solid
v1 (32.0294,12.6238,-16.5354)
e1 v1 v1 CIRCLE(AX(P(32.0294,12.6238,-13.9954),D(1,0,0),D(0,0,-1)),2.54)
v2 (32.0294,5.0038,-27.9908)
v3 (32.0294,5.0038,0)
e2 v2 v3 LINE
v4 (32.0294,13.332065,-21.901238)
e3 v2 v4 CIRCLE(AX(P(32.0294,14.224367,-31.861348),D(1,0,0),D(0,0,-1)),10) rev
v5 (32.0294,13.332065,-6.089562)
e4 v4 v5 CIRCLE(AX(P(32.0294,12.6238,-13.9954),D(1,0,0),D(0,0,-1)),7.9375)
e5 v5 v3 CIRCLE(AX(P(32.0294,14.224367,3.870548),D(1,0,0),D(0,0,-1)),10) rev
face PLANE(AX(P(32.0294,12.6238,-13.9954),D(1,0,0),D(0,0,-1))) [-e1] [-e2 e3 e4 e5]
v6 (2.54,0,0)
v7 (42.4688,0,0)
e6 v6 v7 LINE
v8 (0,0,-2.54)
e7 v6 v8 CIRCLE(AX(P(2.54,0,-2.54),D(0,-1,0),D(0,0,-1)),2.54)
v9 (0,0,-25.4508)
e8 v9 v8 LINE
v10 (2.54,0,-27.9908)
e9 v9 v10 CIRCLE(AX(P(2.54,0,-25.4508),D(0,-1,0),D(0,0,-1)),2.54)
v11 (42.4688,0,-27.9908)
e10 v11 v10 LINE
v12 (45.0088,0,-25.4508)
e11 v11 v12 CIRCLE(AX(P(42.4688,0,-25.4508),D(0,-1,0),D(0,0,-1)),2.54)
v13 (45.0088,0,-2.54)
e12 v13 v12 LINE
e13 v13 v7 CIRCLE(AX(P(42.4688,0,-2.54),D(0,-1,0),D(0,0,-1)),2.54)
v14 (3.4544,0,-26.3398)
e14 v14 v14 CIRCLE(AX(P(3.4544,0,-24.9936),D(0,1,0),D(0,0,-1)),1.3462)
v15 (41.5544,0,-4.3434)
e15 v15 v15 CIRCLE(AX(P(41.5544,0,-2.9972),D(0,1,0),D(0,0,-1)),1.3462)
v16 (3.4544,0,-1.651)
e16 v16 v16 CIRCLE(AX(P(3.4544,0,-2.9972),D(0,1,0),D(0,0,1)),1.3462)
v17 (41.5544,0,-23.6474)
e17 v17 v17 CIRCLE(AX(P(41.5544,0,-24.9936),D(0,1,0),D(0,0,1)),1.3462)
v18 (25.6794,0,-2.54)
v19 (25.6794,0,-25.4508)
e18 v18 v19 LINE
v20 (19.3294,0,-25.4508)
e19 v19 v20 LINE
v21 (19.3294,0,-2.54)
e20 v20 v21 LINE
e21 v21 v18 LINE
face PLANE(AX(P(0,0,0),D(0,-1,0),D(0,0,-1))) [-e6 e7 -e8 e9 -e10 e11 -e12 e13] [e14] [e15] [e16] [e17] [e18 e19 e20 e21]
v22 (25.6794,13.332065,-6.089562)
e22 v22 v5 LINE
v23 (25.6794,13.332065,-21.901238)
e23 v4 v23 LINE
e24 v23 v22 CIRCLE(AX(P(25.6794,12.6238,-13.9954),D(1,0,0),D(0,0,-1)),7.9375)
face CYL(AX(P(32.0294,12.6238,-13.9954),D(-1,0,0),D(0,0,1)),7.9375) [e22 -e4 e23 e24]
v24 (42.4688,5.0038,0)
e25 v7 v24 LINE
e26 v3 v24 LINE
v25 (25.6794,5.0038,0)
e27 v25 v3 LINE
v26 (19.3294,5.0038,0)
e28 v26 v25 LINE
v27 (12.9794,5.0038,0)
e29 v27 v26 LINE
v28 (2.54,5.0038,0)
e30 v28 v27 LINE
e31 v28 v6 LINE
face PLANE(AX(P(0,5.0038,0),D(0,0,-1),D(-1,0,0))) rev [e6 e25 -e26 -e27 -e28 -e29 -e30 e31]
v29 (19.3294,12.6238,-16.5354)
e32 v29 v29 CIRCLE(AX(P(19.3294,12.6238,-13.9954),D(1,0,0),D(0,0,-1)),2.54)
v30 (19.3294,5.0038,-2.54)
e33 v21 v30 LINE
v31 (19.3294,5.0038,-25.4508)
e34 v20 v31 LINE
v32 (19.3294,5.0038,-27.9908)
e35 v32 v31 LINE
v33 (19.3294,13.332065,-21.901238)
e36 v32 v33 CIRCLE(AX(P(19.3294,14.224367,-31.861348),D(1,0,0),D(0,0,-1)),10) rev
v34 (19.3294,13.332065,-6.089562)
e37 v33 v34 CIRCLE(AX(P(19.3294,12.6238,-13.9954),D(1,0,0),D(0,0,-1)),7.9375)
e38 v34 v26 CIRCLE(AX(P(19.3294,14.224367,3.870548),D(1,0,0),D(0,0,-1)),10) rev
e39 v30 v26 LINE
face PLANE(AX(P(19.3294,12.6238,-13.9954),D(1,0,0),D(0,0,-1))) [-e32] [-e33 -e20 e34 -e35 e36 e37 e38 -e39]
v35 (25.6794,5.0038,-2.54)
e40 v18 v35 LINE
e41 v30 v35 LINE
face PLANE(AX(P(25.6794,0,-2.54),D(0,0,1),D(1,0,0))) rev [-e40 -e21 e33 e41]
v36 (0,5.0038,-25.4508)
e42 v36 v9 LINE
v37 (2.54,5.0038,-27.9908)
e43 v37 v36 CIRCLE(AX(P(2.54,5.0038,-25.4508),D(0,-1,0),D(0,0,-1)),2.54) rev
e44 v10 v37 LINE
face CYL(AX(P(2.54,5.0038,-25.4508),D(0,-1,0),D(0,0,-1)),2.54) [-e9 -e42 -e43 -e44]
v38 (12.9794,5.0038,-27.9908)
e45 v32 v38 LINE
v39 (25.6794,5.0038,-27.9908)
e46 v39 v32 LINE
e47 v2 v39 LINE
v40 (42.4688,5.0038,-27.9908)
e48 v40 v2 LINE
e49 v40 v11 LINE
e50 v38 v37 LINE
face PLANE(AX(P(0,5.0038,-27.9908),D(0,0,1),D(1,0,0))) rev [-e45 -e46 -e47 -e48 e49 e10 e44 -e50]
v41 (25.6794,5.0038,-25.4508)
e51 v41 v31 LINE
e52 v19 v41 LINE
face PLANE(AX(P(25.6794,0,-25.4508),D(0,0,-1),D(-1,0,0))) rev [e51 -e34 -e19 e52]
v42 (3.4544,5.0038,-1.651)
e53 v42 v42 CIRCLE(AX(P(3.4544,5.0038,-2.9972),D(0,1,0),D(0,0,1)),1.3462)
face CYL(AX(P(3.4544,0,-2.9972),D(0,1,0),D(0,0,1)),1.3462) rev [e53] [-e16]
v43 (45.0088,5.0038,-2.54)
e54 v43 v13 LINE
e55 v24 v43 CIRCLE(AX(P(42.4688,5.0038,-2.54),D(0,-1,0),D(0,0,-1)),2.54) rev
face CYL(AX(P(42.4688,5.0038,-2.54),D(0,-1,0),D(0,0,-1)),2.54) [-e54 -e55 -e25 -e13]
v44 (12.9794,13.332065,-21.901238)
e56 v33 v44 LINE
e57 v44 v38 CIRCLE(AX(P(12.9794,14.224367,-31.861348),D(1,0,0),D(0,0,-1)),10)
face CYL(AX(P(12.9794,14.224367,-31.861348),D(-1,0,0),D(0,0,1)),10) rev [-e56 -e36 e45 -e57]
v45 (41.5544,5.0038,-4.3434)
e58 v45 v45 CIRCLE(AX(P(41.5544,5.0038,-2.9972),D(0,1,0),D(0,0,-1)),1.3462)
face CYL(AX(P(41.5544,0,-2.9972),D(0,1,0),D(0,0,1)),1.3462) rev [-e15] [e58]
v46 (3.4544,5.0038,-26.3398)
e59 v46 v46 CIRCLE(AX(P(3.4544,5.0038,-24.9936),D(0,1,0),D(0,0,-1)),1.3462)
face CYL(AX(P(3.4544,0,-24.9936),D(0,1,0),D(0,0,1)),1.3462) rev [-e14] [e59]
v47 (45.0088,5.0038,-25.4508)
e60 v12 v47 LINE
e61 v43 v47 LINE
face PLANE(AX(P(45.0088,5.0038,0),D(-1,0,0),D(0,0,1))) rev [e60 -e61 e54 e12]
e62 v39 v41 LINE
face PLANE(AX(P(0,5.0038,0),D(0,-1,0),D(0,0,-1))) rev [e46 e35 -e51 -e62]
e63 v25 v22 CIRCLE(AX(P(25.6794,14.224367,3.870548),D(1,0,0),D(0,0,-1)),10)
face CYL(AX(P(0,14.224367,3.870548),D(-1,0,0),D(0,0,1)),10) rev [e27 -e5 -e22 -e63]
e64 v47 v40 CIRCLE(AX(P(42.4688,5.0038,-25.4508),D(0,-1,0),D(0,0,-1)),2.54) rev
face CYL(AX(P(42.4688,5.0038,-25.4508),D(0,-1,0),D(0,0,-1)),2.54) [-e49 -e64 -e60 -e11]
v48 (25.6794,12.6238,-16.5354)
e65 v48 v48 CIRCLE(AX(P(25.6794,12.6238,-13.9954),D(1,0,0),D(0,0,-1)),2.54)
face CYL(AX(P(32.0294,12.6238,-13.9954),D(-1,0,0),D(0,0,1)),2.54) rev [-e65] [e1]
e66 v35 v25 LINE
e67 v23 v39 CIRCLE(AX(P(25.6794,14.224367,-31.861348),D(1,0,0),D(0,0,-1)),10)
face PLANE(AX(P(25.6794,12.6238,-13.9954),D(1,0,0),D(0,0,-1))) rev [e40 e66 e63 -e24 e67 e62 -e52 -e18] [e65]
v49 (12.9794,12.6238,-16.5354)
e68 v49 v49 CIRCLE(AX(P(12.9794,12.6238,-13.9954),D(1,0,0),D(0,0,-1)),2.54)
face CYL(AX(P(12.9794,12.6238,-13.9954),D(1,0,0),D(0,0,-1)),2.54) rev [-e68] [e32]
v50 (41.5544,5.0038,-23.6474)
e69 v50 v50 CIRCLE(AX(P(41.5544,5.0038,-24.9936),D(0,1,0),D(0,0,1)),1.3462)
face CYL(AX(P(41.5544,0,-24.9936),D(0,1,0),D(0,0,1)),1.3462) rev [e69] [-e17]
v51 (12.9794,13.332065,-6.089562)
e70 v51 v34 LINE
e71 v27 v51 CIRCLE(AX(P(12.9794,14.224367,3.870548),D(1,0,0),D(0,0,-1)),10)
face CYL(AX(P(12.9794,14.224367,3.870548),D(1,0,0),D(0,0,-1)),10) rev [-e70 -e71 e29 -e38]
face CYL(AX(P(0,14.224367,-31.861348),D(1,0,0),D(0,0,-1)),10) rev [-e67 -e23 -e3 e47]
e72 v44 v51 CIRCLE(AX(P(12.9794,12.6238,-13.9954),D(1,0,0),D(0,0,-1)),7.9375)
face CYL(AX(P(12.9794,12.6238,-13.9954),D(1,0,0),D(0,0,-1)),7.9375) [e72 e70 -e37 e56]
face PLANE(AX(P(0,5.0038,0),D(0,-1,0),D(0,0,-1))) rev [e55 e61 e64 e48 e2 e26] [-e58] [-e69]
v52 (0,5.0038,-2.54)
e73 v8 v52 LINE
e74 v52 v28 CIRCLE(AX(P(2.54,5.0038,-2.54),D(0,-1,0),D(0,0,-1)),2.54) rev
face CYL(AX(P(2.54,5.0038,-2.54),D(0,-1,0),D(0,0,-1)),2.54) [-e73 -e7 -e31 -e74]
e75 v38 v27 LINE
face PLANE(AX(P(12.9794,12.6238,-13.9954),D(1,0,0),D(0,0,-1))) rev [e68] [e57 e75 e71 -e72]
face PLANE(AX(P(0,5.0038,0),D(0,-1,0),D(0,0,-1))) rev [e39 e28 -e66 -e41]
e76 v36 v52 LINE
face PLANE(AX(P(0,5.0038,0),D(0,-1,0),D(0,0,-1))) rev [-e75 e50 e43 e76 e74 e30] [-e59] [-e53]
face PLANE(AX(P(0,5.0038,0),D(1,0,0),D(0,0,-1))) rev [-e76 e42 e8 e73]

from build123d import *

# Parameters (mm, degrees)
SKETCH1_W           = 45.0088
SKETCH1_H           = 27.9908
BOSS_EXTRUDE1_DEPTH = 5.0038
SKETCH2_R           = 1.3462
CUT_EXTRUDE1_DEPTH  = 5.0038
FILLET1_R           = 2.54
BOSS_EXTRUDE2_START = 3.175
SKETCH3_R           = 7.9375
SKETCH3_R_2         = 2.54
BOSS_EXTRUDE2_DEPTH = 6.35
BOSS_EXTRUDE3_START = -9.525
SKETCH4_R           = 7.9375
SKETCH4_R_2         = 2.54
BOSS_EXTRUDE3_DEPTH = 6.35
FILLET2_R           = 10.000000066
SKETCH5_W           = 6.35
SKETCH5_H           = 22.9108
CUT_EXTRUDE2_DEPTH  = 56.238689053


with BuildPart() as part:
    # Sketch1 → Boss-Extrude1 (new body)
    with BuildSketch(Plane(origin=(0, 0, 0), x_dir=(1, 0, 0), z_dir=(0, 1, 0))):
        with Locations((22.5044, 13.9954)):
            Rectangle(SKETCH1_W, SKETCH1_H)
    extrude(amount=BOSS_EXTRUDE1_DEPTH)

    # Sketch2 → Cut-Extrude1 (cut)
    with BuildSketch(Plane(origin=(0, 5.0038, 0), x_dir=(1, 0, 0), z_dir=(0, 1, 0))):
        with Locations(Location((41.5544, 24.9936, 0), (0, 0, 270))):
            Circle(SKETCH2_R)
        with Locations(Location((41.5544, 2.9972, 0), (0, 0, 90))):
            Circle(SKETCH2_R)
        with Locations(Location((3.4544, 24.9936, 0), (0, 0, 90))):
            Circle(SKETCH2_R)
        with Locations(Location((3.4544, 2.9972, 0), (0, 0, 270))):
            Circle(SKETCH2_R)
    extrude(amount=-CUT_EXTRUDE1_DEPTH, mode=Mode.SUBTRACT)

    # Fillet1
    fillet1_edges = [part.edges().sort_by_distance(p)[0] for p in [
        (0, 2.5019, -27.9908),
        (45.0088, 2.5019, -27.9908),
        (45.0088, 2.5019, 0),
        (0, 2.5019, 0),
    ]]
    fillet(fillet1_edges, radius=FILLET1_R)

    # Sketch3 → Boss-Extrude2 (add)
    with BuildSketch(Plane(origin=(22.5044, 0, 0), x_dir=(0, 0, -1), z_dir=(1, 0, 0)).offset(BOSS_EXTRUDE2_START)):
        with Locations((13.9954, 12.6238)):
            Circle(SKETCH3_R)
        with Locations((13.9954, 12.6238)):
            Circle(SKETCH3_R_2, mode=Mode.SUBTRACT)
    extrude(amount=BOSS_EXTRUDE2_DEPTH)

    # Sketch4 → Boss-Extrude3 (add)
    with BuildSketch(Plane(origin=(22.5044, 0, 0), x_dir=(0, 0, -1), z_dir=(1, 0, 0)).offset(BOSS_EXTRUDE3_START)):
        with Locations((13.9954, 12.6238)):
            Circle(SKETCH4_R)
        with Locations((13.9954, 12.6238)):
            Circle(SKETCH4_R_2, mode=Mode.SUBTRACT)
    extrude(amount=BOSS_EXTRUDE3_DEPTH)

    # Fillet2
    # the kernel refuses this fillet: 10.000000066 mm, written as the material it adds along each edge
    with BuildSketch(Plane(origin=(32.0294, 5.0038, -16.2179), x_dir=(0, 0, -1), z_dir=(-1, 0, 0)), Plane(origin=(19.3294, 5.0038, -16.2179), x_dir=(0, 0, -1), z_dir=(-1, 0, 0))) as fillet2_piece_1:
        with BuildLine():
            CenterArc((15.643447864, -9.220567258), FILLET2_R, 112.771363132, 62.10931252)
            Line((5.683337527, -8.328264951), (5.484135321, -8.310418905))
            ThreePointArc((5.484135321, -8.310418905), (4.168656518, -3.258575394), (-0.056, -0.192000001))
            Line((-0.056, -0.192000001), (0, 0.200000001))
            ThreePointArc((0, 0.200000001), (5.88645, 0.200000001), (11.695489043, 0.184411345))
            Line((11.695489043, 0.184411345), (11.7729, 0))
        make_face()
    extrude(amount=6.35)
    with BuildSketch(Plane(origin=(32.0294, 5.0038, -16.2179), x_dir=(0, 0, -1), z_dir=(-1, 0, 0))) as fillet2_piece_2_section:
        with BuildLine():
            CenterArc((15.643447864, -9.220567258), FILLET2_R, 112.771363132, 62.10931252)
            Line((5.683337527, -8.328264951), (5.484135321, -8.310418905))
            ThreePointArc((5.484135321, -8.310418905), (4.168656518, -3.258575394), (-0.056, -0.192000001))
            Line((-0.056, -0.192000001), (0, 0.200000001))
            ThreePointArc((0, 0.200000001), (5.88645, 0.200000001), (11.695489043, 0.184411345))
            Line((11.695489043, 0.184411345), (11.7729, 0))
        make_face()
    fillet2_piece_2 = extrude(amount=35.78225, mode=Mode.PRIVATE)
    fillet2_piece_2 = split(fillet2_piece_2, bisect_by=Plane(origin=(12.9794, 6.888894544, -22.053995201), z_dir=(1, 0, 0)), keep=Keep.TOP, mode=Mode.PRIVATE)
    fillet2_piece_2 = split(fillet2_piece_2, bisect_by=Plane(origin=(19.3294, 6.888894544, -22.053995201), z_dir=(-1, 0, 0)), keep=Keep.TOP, mode=Mode.PRIVATE)
    add(fillet2_piece_2)
    with BuildSketch(Plane(origin=(32.0294, 5.0038, -11.7729), x_dir=(0, 0, 1), z_dir=(-1, 0, 0)), Plane(origin=(19.3294, 5.0038, -11.7729), x_dir=(0, 0, 1), z_dir=(-1, 0, 0))) as fillet2_piece_3:
        with BuildLine():
            CenterArc((15.643447864, 9.220567258), FILLET2_R, 185.119324348, 62.10931252)
            Line((5.683337527, 8.328264951), (5.484135321, 8.310418905))
            ThreePointArc((5.484135321, 8.310418905), (4.168656518, 3.258575394), (-0.056, 0.192000001))
            Line((-0.056, 0.192000001), (0, -0.200000001))
            ThreePointArc((0, -0.200000001), (5.88645, -0.200000001), (11.695489043, -0.184411345))
            Line((11.695489043, -0.184411345), (11.7729, 0))
        make_face()
    extrude(amount=6.35)
    with BuildSketch(Plane(origin=(32.0294, 5.0038, -11.7729), x_dir=(0, 0, 1), z_dir=(-1, 0, 0))) as fillet2_piece_4_section:
        with BuildLine():
            CenterArc((15.643447864, 9.220567258), FILLET2_R, 185.119324348, 62.10931252)
            Line((5.683337527, 8.328264951), (5.484135321, 8.310418905))
            ThreePointArc((5.484135321, 8.310418905), (4.168656518, 3.258575394), (-0.056, 0.192000001))
            Line((-0.056, 0.192000001), (0, -0.200000001))
            ThreePointArc((0, -0.200000001), (5.88645, -0.200000001), (11.695489043, -0.184411345))
            Line((11.695489043, -0.184411345), (11.7729, 0))
        make_face()
    fillet2_piece_4 = extrude(amount=35.78225, mode=Mode.PRIVATE)
    fillet2_piece_4 = split(fillet2_piece_4, bisect_by=Plane(origin=(12.9794, 6.888894544, -5.936804799), z_dir=(1, 0, 0)), keep=Keep.TOP, mode=Mode.PRIVATE)
    fillet2_piece_4 = split(fillet2_piece_4, bisect_by=Plane(origin=(19.3294, 6.888894544, -5.936804799), z_dir=(-1, 0, 0)), keep=Keep.TOP, mode=Mode.PRIVATE)
    add(fillet2_piece_4)
    with BuildSketch(Plane(origin=(48.76165, 5.0038, -11.7729), x_dir=(0, 0, 1), z_dir=(-1, 0, 0))) as fillet2_piece_5_section:
        with BuildLine():
            CenterArc((15.643447864, 9.220567258), FILLET2_R, 185.119324348, 62.10931252)
            Line((5.683337527, 8.328264951), (5.484135321, 8.310418905))
            ThreePointArc((5.484135321, 8.310418905), (4.168656518, 3.258575394), (-0.056, 0.192000001))
            Line((-0.056, 0.192000001), (0, -0.200000001))
            ThreePointArc((0, -0.200000001), (5.88645, -0.200000001), (11.695489043, -0.184411345))
            Line((11.695489043, -0.184411345), (11.7729, 0))
        make_face()
    fillet2_piece_5 = extrude(amount=35.78225, mode=Mode.PRIVATE)
    fillet2_piece_5 = split(fillet2_piece_5, bisect_by=Plane(origin=(25.6794, 6.888894544, -5.936804799), z_dir=(1, 0, 0)), keep=Keep.TOP, mode=Mode.PRIVATE)
    fillet2_piece_5 = split(fillet2_piece_5, bisect_by=Plane(origin=(32.0294, 6.888894544, -5.936804799), z_dir=(-1, 0, 0)), keep=Keep.TOP, mode=Mode.PRIVATE)
    add(fillet2_piece_5)
    with BuildSketch(Plane(origin=(48.76165, 5.0038, -16.2179), x_dir=(0, 0, -1), z_dir=(-1, 0, 0))) as fillet2_piece_6_section:
        with BuildLine():
            CenterArc((15.643447864, -9.220567258), FILLET2_R, 112.771363132, 62.10931252)
            Line((5.683337527, -8.328264951), (5.484135321, -8.310418905))
            ThreePointArc((5.484135321, -8.310418905), (4.168656518, -3.258575394), (-0.056, -0.192000001))
            Line((-0.056, -0.192000001), (0, 0.200000001))
            ThreePointArc((0, 0.200000001), (5.88645, 0.200000001), (11.695489043, 0.184411345))
            Line((11.695489043, 0.184411345), (11.7729, 0))
        make_face()
    fillet2_piece_6 = extrude(amount=35.78225, mode=Mode.PRIVATE)
    fillet2_piece_6 = split(fillet2_piece_6, bisect_by=Plane(origin=(25.6794, 6.888894544, -22.053995201), z_dir=(1, 0, 0)), keep=Keep.TOP, mode=Mode.PRIVATE)
    fillet2_piece_6 = split(fillet2_piece_6, bisect_by=Plane(origin=(32.0294, 6.888894544, -22.053995201), z_dir=(-1, 0, 0)), keep=Keep.TOP, mode=Mode.PRIVATE)
    add(fillet2_piece_6)

    # Sketch5 → Cut-Extrude2 (cut, through all)
    with BuildSketch(Plane(origin=(0, 5.0038, 0), x_dir=(1, 0, 0), z_dir=(0, 1, 0))):
        with Locations((22.5044, 13.9954)):
            Rectangle(SKETCH5_W, SKETCH5_H)
    extrude(amount=-CUT_EXTRUDE2_DEPTH, mode=Mode.SUBTRACT)


solid = part.part
